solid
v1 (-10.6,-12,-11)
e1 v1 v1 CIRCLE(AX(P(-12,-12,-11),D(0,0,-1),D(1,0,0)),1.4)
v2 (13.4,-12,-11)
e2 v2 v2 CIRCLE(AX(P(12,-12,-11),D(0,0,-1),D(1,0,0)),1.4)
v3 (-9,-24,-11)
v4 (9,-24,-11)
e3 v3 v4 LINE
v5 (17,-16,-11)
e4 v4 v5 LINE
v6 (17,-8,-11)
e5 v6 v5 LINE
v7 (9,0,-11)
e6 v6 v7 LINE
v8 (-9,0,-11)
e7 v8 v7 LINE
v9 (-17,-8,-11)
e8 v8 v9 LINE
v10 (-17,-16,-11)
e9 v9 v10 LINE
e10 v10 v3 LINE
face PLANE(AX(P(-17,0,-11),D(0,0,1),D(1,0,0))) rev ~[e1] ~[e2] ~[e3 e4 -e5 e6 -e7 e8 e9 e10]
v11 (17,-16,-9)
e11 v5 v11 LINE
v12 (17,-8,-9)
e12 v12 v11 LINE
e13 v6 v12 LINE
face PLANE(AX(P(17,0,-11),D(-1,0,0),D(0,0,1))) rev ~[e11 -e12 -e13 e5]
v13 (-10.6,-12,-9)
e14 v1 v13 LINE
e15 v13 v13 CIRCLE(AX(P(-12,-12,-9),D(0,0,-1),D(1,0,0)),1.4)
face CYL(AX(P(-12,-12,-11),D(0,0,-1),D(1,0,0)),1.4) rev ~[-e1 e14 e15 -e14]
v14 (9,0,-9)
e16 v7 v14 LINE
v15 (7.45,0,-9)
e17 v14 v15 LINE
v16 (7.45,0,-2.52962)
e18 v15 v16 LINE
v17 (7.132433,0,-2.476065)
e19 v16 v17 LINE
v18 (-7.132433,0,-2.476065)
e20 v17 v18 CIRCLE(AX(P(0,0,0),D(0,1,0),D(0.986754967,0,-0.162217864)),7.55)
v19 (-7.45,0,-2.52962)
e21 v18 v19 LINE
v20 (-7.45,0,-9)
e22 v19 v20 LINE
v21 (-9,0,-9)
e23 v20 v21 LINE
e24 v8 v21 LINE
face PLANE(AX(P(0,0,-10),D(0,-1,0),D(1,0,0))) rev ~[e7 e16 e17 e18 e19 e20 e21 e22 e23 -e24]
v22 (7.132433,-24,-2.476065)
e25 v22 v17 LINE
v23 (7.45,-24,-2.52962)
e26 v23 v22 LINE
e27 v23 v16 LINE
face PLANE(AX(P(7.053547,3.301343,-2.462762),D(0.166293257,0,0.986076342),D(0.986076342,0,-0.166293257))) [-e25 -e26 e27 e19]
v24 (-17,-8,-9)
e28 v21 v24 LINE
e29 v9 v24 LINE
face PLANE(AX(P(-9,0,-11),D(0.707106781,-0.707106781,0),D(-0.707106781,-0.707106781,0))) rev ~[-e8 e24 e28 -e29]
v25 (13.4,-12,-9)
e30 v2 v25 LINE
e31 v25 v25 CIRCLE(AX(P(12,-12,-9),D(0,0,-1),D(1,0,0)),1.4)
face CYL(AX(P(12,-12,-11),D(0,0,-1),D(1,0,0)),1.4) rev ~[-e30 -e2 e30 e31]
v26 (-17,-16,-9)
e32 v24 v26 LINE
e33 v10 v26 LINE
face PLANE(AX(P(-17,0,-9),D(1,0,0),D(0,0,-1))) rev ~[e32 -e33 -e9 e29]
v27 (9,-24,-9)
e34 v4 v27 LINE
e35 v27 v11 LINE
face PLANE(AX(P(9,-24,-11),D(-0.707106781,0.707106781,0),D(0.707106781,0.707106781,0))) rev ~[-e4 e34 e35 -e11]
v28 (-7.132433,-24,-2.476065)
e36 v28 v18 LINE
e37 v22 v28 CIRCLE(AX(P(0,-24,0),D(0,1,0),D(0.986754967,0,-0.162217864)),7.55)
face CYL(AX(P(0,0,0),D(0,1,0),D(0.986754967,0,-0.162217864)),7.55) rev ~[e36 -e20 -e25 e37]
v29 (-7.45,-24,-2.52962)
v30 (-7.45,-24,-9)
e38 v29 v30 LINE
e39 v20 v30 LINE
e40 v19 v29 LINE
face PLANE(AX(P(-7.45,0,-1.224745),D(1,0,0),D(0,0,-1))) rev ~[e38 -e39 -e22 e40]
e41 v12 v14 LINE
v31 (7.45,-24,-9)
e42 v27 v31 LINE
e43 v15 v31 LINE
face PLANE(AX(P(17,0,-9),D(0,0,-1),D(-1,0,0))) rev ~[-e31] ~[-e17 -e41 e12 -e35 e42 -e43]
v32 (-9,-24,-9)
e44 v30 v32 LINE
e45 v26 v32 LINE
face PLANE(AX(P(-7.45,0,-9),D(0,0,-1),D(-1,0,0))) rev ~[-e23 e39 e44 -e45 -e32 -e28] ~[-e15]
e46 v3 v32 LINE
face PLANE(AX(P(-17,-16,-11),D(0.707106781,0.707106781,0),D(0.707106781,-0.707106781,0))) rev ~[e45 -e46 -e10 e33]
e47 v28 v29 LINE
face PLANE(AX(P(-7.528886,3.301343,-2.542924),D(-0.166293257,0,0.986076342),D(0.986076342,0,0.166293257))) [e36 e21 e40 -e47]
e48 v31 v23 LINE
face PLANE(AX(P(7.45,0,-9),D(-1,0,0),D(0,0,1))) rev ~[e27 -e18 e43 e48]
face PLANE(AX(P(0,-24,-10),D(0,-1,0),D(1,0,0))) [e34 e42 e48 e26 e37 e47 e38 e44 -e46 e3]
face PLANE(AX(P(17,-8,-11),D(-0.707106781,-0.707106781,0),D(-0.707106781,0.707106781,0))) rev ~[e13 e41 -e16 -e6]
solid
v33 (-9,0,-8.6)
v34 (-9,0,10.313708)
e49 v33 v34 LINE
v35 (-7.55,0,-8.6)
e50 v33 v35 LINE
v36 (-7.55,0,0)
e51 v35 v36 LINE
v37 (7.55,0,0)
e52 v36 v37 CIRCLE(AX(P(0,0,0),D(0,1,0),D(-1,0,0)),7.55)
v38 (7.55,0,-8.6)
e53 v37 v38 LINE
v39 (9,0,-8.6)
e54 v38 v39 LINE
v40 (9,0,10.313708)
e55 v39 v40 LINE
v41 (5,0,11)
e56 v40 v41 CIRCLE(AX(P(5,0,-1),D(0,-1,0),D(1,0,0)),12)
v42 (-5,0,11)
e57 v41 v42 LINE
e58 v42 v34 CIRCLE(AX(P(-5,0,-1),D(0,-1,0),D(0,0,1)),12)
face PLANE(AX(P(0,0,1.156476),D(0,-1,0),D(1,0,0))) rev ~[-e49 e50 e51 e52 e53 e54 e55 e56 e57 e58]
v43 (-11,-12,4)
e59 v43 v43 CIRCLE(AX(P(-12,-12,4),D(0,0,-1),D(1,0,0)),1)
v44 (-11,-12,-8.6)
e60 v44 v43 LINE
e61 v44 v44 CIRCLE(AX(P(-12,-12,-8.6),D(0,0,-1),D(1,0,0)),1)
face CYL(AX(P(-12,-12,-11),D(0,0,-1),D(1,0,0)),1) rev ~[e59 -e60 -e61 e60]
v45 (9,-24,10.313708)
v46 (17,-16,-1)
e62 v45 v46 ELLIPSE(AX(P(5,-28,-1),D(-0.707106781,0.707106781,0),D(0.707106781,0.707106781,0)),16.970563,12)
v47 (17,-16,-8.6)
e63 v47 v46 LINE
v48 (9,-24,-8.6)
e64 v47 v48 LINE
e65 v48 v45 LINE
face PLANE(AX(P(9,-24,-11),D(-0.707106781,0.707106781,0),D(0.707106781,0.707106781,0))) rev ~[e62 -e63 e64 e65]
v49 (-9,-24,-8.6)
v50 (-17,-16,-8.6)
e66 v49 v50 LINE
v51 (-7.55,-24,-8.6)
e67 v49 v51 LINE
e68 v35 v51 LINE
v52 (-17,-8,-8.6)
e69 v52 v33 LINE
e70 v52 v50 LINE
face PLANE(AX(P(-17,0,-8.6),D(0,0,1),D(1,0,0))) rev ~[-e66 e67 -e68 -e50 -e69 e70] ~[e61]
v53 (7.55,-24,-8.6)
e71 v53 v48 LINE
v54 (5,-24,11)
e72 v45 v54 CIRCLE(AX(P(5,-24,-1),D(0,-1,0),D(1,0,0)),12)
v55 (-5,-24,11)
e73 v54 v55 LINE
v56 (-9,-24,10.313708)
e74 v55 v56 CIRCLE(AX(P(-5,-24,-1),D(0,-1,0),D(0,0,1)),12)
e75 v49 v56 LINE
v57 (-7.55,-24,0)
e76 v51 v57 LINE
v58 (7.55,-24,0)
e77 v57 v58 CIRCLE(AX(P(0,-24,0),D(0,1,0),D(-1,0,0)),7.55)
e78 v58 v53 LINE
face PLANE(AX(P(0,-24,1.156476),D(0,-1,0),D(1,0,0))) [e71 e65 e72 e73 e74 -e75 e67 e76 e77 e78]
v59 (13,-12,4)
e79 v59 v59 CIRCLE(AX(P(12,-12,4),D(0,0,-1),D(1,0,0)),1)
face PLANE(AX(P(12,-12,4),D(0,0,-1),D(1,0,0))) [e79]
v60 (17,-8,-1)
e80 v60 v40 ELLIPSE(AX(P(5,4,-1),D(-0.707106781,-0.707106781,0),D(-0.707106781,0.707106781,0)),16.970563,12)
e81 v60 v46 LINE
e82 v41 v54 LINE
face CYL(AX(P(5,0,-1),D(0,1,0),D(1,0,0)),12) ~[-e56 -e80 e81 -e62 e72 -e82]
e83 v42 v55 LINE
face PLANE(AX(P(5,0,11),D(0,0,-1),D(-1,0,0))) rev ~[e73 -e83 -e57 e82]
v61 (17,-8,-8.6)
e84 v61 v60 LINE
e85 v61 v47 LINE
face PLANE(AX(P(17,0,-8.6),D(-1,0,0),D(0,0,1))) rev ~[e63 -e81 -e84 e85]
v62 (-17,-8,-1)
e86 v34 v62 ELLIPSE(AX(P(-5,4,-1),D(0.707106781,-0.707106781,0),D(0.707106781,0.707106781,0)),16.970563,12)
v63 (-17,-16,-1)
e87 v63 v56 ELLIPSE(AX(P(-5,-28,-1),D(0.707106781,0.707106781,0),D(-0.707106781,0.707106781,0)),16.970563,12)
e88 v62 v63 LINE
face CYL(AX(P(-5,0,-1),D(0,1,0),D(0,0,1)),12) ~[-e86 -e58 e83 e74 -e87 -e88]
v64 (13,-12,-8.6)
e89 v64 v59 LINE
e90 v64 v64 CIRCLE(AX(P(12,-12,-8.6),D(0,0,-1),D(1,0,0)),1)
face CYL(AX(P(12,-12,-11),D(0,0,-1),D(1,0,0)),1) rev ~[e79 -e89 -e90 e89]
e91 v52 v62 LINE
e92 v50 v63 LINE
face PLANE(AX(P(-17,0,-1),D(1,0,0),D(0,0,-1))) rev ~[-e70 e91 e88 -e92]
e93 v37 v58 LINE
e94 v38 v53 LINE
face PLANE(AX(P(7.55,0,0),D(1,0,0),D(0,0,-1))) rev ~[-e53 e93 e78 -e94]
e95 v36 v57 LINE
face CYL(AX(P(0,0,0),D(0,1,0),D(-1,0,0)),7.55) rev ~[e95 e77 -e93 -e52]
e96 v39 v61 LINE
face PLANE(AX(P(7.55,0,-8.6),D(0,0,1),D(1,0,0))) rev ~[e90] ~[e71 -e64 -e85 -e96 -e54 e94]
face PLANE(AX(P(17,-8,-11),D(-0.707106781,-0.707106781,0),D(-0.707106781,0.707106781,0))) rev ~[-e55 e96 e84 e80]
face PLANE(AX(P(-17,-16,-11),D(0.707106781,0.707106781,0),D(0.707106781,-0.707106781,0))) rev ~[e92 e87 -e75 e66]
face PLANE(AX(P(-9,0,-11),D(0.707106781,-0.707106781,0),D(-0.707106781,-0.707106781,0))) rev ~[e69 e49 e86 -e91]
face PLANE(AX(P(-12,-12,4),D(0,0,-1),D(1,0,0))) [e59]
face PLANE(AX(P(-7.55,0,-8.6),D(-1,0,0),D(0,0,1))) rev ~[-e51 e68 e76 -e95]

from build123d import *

# Parameters (mm, degrees)
F1_DEPTH    = 24
F2_DEPTH    = 24
F4_DEPTH    = 22.001
F5_R        = 1
F6_DEPTH    = 15
F5_R_2      = 1.4
F7_DEPTH    = 2
F8_T1_DEPTH = 30.6026868141


# Not quite as in the source:
# - a fillet or chamfer that OpenCascade refuses, or shapes differently, is made with other operations: its cross-section is extruded or revolved along the edge and cut away or added


with BuildPart() as f1:
    # F0 (on Front) → F1 (new body)
    with BuildSketch(Plane.XZ):
        with BuildLine():
            Line((7.55, -8.6), (17, -8.6))
            Line((17, -8.6), (17, -1))
            ThreePointArc((17, -1), (13.4852813742, 7.4852813742), (5, 11))
            Line((5, 11), (-5, 11))
            ThreePointArc((-5, 11), (-13.4852813742, 7.4852813742), (-17, -1))
            Line((-17, -1), (-17, -8.6))
            Line((-17, -8.6), (-7.55, -8.6))
            Line((-7.55, -8.6), (-7.55, 0))
            ThreePointArc((-7.55, 0), (0, 7.55), (7.55, 0))
            Line((7.55, 0), (7.55, -8.6))
        make_face()
    extrude(amount=F1_DEPTH)


with BuildPart() as f2:
    # F0 (on Front) → F2 (new body)
    with BuildSketch(Plane.XZ):
        Polygon((-17, -11), (17, -11), (17, -9), (7.45, -9), (-7.45, -9), (-17, -9), align=None)
        with BuildLine():
            Line((-7.45, -9), (7.45, -9))
            Line((7.45, -9), (7.45, -1.2247448714))
            ThreePointArc((7.45, -1.2247448714), (0, -7.55), (-7.45, -1.2247448714))
            Line((-7.45, -1.2247448714), (-7.45, -9))
        make_face()
    extrude(amount=F2_DEPTH)


with BuildPart() as f4_tool:
    # F3 (on face) → F4 (new body, through all)
    with BuildSketch(Plane(origin=(0, 0, -11), x_dir=(1, 0, 0), z_dir=(0, 0, -1))):
        Polygon((-17, 16), (-9, 24), (-17, 24), align=None)
        Polygon((-9, 0), (-17, 8), (-17, 0), align=None)
        Polygon((17, 0), (17, 8), (9, 0), align=None)
        Polygon((17, 24), (9, 24), (17, 16), align=None)
    extrude(amount=-F4_DEPTH)


with BuildPart() as f1_1:
    add(f1.part)

    # F4: cut by f4_tool
    add(f4_tool.part, mode=Mode.SUBTRACT)


with BuildPart() as f2_1:
    add(f2.part)

    # F4: cut by f4_tool
    add(f4_tool.part, mode=Mode.SUBTRACT)


with BuildPart() as f6_tool:
    # F5 (on face) → F6 (new body)
    with BuildSketch(Plane(origin=(0, 0, -11), x_dir=(1, 0, 0), z_dir=(0, 0, -1))):
        with Locations((-12, 12)):
            Circle(F5_R)
        with Locations((12, 12)):
            Circle(F5_R)
    extrude(amount=-F6_DEPTH)


with BuildPart() as f1_2:
    add(f1_1.part)

    # F6: cut by f6_tool
    add(f6_tool.part, mode=Mode.SUBTRACT)


with BuildPart() as f2_2:
    add(f2_1.part)

    # F6: cut by f6_tool
    add(f6_tool.part, mode=Mode.SUBTRACT)

    # F5 (on face) → F7 (cut, through all)
    with BuildSketch(Plane(origin=(0, 0, -11), x_dir=(1, 0, 0), z_dir=(0, 0, -1))):
        with Locations((-12, 12)):
            Circle(F5_R_2)
        with Locations((-12, 12)):
            Circle(F5_R, mode=Mode.SUBTRACT)
        with Locations((12, 12)):
            Circle(F5_R_2)
        with Locations((12, 12)):
            Circle(F5_R, mode=Mode.SUBTRACT)
    extrude(amount=-F7_DEPTH, mode=Mode.SUBTRACT)

    # F8: chamfer of 2 on 2 edges, made by hand

    # F8_s2 → F8_t1 (cut)
    with BuildSketch(Plane.XZ.offset(-3.3013434071)):
        with BuildLine():
            Line((-7.5288861074, -2.5429238838), (-7.0535468383, -2.4627620222))
            Line((-7.0535468383, -2.4627620222), (-7.0157591141, -2.4496437945))
            ThreePointArc((-7.0157591141, -2.4496437945), (-7.2784359572, -1.8505323605), (-7.4105298013, -1.2182561568))
            Line((-7.4105298013, -1.2182561568), (-7.49, -1.2247448714))
            ThreePointArc((-7.49, -1.2247448714), (-7.49, -1.8838343776), (-7.5688861074, -2.5429238838))
            Line((-7.5688861074, -2.5429238838), (-7.5288861074, -2.5429238838))
        make_face()
        with BuildLine():
            Line((7.0535468383, -2.4627620222), (7.5288861074, -2.5429238838))
            Line((7.5288861074, -2.5429238838), (7.5688861074, -2.5429238838))
            ThreePointArc((7.5688861074, -2.5429238838), (7.49, -1.8838343776), (7.49, -1.2247448714))
            Line((7.49, -1.2247448714), (7.4105298013, -1.2182561568))
            ThreePointArc((7.4105298013, -1.2182561568), (7.2784359572, -1.8505323605), (7.0157591141, -2.4496437945))
            Line((7.0157591141, -2.4496437945), (7.0535468383, -2.4627620222))
        make_face()
    extrude(amount=F8_T1_DEPTH, mode=Mode.SUBTRACT)


solid = Compound([f1_2.part, f2_2.part])
